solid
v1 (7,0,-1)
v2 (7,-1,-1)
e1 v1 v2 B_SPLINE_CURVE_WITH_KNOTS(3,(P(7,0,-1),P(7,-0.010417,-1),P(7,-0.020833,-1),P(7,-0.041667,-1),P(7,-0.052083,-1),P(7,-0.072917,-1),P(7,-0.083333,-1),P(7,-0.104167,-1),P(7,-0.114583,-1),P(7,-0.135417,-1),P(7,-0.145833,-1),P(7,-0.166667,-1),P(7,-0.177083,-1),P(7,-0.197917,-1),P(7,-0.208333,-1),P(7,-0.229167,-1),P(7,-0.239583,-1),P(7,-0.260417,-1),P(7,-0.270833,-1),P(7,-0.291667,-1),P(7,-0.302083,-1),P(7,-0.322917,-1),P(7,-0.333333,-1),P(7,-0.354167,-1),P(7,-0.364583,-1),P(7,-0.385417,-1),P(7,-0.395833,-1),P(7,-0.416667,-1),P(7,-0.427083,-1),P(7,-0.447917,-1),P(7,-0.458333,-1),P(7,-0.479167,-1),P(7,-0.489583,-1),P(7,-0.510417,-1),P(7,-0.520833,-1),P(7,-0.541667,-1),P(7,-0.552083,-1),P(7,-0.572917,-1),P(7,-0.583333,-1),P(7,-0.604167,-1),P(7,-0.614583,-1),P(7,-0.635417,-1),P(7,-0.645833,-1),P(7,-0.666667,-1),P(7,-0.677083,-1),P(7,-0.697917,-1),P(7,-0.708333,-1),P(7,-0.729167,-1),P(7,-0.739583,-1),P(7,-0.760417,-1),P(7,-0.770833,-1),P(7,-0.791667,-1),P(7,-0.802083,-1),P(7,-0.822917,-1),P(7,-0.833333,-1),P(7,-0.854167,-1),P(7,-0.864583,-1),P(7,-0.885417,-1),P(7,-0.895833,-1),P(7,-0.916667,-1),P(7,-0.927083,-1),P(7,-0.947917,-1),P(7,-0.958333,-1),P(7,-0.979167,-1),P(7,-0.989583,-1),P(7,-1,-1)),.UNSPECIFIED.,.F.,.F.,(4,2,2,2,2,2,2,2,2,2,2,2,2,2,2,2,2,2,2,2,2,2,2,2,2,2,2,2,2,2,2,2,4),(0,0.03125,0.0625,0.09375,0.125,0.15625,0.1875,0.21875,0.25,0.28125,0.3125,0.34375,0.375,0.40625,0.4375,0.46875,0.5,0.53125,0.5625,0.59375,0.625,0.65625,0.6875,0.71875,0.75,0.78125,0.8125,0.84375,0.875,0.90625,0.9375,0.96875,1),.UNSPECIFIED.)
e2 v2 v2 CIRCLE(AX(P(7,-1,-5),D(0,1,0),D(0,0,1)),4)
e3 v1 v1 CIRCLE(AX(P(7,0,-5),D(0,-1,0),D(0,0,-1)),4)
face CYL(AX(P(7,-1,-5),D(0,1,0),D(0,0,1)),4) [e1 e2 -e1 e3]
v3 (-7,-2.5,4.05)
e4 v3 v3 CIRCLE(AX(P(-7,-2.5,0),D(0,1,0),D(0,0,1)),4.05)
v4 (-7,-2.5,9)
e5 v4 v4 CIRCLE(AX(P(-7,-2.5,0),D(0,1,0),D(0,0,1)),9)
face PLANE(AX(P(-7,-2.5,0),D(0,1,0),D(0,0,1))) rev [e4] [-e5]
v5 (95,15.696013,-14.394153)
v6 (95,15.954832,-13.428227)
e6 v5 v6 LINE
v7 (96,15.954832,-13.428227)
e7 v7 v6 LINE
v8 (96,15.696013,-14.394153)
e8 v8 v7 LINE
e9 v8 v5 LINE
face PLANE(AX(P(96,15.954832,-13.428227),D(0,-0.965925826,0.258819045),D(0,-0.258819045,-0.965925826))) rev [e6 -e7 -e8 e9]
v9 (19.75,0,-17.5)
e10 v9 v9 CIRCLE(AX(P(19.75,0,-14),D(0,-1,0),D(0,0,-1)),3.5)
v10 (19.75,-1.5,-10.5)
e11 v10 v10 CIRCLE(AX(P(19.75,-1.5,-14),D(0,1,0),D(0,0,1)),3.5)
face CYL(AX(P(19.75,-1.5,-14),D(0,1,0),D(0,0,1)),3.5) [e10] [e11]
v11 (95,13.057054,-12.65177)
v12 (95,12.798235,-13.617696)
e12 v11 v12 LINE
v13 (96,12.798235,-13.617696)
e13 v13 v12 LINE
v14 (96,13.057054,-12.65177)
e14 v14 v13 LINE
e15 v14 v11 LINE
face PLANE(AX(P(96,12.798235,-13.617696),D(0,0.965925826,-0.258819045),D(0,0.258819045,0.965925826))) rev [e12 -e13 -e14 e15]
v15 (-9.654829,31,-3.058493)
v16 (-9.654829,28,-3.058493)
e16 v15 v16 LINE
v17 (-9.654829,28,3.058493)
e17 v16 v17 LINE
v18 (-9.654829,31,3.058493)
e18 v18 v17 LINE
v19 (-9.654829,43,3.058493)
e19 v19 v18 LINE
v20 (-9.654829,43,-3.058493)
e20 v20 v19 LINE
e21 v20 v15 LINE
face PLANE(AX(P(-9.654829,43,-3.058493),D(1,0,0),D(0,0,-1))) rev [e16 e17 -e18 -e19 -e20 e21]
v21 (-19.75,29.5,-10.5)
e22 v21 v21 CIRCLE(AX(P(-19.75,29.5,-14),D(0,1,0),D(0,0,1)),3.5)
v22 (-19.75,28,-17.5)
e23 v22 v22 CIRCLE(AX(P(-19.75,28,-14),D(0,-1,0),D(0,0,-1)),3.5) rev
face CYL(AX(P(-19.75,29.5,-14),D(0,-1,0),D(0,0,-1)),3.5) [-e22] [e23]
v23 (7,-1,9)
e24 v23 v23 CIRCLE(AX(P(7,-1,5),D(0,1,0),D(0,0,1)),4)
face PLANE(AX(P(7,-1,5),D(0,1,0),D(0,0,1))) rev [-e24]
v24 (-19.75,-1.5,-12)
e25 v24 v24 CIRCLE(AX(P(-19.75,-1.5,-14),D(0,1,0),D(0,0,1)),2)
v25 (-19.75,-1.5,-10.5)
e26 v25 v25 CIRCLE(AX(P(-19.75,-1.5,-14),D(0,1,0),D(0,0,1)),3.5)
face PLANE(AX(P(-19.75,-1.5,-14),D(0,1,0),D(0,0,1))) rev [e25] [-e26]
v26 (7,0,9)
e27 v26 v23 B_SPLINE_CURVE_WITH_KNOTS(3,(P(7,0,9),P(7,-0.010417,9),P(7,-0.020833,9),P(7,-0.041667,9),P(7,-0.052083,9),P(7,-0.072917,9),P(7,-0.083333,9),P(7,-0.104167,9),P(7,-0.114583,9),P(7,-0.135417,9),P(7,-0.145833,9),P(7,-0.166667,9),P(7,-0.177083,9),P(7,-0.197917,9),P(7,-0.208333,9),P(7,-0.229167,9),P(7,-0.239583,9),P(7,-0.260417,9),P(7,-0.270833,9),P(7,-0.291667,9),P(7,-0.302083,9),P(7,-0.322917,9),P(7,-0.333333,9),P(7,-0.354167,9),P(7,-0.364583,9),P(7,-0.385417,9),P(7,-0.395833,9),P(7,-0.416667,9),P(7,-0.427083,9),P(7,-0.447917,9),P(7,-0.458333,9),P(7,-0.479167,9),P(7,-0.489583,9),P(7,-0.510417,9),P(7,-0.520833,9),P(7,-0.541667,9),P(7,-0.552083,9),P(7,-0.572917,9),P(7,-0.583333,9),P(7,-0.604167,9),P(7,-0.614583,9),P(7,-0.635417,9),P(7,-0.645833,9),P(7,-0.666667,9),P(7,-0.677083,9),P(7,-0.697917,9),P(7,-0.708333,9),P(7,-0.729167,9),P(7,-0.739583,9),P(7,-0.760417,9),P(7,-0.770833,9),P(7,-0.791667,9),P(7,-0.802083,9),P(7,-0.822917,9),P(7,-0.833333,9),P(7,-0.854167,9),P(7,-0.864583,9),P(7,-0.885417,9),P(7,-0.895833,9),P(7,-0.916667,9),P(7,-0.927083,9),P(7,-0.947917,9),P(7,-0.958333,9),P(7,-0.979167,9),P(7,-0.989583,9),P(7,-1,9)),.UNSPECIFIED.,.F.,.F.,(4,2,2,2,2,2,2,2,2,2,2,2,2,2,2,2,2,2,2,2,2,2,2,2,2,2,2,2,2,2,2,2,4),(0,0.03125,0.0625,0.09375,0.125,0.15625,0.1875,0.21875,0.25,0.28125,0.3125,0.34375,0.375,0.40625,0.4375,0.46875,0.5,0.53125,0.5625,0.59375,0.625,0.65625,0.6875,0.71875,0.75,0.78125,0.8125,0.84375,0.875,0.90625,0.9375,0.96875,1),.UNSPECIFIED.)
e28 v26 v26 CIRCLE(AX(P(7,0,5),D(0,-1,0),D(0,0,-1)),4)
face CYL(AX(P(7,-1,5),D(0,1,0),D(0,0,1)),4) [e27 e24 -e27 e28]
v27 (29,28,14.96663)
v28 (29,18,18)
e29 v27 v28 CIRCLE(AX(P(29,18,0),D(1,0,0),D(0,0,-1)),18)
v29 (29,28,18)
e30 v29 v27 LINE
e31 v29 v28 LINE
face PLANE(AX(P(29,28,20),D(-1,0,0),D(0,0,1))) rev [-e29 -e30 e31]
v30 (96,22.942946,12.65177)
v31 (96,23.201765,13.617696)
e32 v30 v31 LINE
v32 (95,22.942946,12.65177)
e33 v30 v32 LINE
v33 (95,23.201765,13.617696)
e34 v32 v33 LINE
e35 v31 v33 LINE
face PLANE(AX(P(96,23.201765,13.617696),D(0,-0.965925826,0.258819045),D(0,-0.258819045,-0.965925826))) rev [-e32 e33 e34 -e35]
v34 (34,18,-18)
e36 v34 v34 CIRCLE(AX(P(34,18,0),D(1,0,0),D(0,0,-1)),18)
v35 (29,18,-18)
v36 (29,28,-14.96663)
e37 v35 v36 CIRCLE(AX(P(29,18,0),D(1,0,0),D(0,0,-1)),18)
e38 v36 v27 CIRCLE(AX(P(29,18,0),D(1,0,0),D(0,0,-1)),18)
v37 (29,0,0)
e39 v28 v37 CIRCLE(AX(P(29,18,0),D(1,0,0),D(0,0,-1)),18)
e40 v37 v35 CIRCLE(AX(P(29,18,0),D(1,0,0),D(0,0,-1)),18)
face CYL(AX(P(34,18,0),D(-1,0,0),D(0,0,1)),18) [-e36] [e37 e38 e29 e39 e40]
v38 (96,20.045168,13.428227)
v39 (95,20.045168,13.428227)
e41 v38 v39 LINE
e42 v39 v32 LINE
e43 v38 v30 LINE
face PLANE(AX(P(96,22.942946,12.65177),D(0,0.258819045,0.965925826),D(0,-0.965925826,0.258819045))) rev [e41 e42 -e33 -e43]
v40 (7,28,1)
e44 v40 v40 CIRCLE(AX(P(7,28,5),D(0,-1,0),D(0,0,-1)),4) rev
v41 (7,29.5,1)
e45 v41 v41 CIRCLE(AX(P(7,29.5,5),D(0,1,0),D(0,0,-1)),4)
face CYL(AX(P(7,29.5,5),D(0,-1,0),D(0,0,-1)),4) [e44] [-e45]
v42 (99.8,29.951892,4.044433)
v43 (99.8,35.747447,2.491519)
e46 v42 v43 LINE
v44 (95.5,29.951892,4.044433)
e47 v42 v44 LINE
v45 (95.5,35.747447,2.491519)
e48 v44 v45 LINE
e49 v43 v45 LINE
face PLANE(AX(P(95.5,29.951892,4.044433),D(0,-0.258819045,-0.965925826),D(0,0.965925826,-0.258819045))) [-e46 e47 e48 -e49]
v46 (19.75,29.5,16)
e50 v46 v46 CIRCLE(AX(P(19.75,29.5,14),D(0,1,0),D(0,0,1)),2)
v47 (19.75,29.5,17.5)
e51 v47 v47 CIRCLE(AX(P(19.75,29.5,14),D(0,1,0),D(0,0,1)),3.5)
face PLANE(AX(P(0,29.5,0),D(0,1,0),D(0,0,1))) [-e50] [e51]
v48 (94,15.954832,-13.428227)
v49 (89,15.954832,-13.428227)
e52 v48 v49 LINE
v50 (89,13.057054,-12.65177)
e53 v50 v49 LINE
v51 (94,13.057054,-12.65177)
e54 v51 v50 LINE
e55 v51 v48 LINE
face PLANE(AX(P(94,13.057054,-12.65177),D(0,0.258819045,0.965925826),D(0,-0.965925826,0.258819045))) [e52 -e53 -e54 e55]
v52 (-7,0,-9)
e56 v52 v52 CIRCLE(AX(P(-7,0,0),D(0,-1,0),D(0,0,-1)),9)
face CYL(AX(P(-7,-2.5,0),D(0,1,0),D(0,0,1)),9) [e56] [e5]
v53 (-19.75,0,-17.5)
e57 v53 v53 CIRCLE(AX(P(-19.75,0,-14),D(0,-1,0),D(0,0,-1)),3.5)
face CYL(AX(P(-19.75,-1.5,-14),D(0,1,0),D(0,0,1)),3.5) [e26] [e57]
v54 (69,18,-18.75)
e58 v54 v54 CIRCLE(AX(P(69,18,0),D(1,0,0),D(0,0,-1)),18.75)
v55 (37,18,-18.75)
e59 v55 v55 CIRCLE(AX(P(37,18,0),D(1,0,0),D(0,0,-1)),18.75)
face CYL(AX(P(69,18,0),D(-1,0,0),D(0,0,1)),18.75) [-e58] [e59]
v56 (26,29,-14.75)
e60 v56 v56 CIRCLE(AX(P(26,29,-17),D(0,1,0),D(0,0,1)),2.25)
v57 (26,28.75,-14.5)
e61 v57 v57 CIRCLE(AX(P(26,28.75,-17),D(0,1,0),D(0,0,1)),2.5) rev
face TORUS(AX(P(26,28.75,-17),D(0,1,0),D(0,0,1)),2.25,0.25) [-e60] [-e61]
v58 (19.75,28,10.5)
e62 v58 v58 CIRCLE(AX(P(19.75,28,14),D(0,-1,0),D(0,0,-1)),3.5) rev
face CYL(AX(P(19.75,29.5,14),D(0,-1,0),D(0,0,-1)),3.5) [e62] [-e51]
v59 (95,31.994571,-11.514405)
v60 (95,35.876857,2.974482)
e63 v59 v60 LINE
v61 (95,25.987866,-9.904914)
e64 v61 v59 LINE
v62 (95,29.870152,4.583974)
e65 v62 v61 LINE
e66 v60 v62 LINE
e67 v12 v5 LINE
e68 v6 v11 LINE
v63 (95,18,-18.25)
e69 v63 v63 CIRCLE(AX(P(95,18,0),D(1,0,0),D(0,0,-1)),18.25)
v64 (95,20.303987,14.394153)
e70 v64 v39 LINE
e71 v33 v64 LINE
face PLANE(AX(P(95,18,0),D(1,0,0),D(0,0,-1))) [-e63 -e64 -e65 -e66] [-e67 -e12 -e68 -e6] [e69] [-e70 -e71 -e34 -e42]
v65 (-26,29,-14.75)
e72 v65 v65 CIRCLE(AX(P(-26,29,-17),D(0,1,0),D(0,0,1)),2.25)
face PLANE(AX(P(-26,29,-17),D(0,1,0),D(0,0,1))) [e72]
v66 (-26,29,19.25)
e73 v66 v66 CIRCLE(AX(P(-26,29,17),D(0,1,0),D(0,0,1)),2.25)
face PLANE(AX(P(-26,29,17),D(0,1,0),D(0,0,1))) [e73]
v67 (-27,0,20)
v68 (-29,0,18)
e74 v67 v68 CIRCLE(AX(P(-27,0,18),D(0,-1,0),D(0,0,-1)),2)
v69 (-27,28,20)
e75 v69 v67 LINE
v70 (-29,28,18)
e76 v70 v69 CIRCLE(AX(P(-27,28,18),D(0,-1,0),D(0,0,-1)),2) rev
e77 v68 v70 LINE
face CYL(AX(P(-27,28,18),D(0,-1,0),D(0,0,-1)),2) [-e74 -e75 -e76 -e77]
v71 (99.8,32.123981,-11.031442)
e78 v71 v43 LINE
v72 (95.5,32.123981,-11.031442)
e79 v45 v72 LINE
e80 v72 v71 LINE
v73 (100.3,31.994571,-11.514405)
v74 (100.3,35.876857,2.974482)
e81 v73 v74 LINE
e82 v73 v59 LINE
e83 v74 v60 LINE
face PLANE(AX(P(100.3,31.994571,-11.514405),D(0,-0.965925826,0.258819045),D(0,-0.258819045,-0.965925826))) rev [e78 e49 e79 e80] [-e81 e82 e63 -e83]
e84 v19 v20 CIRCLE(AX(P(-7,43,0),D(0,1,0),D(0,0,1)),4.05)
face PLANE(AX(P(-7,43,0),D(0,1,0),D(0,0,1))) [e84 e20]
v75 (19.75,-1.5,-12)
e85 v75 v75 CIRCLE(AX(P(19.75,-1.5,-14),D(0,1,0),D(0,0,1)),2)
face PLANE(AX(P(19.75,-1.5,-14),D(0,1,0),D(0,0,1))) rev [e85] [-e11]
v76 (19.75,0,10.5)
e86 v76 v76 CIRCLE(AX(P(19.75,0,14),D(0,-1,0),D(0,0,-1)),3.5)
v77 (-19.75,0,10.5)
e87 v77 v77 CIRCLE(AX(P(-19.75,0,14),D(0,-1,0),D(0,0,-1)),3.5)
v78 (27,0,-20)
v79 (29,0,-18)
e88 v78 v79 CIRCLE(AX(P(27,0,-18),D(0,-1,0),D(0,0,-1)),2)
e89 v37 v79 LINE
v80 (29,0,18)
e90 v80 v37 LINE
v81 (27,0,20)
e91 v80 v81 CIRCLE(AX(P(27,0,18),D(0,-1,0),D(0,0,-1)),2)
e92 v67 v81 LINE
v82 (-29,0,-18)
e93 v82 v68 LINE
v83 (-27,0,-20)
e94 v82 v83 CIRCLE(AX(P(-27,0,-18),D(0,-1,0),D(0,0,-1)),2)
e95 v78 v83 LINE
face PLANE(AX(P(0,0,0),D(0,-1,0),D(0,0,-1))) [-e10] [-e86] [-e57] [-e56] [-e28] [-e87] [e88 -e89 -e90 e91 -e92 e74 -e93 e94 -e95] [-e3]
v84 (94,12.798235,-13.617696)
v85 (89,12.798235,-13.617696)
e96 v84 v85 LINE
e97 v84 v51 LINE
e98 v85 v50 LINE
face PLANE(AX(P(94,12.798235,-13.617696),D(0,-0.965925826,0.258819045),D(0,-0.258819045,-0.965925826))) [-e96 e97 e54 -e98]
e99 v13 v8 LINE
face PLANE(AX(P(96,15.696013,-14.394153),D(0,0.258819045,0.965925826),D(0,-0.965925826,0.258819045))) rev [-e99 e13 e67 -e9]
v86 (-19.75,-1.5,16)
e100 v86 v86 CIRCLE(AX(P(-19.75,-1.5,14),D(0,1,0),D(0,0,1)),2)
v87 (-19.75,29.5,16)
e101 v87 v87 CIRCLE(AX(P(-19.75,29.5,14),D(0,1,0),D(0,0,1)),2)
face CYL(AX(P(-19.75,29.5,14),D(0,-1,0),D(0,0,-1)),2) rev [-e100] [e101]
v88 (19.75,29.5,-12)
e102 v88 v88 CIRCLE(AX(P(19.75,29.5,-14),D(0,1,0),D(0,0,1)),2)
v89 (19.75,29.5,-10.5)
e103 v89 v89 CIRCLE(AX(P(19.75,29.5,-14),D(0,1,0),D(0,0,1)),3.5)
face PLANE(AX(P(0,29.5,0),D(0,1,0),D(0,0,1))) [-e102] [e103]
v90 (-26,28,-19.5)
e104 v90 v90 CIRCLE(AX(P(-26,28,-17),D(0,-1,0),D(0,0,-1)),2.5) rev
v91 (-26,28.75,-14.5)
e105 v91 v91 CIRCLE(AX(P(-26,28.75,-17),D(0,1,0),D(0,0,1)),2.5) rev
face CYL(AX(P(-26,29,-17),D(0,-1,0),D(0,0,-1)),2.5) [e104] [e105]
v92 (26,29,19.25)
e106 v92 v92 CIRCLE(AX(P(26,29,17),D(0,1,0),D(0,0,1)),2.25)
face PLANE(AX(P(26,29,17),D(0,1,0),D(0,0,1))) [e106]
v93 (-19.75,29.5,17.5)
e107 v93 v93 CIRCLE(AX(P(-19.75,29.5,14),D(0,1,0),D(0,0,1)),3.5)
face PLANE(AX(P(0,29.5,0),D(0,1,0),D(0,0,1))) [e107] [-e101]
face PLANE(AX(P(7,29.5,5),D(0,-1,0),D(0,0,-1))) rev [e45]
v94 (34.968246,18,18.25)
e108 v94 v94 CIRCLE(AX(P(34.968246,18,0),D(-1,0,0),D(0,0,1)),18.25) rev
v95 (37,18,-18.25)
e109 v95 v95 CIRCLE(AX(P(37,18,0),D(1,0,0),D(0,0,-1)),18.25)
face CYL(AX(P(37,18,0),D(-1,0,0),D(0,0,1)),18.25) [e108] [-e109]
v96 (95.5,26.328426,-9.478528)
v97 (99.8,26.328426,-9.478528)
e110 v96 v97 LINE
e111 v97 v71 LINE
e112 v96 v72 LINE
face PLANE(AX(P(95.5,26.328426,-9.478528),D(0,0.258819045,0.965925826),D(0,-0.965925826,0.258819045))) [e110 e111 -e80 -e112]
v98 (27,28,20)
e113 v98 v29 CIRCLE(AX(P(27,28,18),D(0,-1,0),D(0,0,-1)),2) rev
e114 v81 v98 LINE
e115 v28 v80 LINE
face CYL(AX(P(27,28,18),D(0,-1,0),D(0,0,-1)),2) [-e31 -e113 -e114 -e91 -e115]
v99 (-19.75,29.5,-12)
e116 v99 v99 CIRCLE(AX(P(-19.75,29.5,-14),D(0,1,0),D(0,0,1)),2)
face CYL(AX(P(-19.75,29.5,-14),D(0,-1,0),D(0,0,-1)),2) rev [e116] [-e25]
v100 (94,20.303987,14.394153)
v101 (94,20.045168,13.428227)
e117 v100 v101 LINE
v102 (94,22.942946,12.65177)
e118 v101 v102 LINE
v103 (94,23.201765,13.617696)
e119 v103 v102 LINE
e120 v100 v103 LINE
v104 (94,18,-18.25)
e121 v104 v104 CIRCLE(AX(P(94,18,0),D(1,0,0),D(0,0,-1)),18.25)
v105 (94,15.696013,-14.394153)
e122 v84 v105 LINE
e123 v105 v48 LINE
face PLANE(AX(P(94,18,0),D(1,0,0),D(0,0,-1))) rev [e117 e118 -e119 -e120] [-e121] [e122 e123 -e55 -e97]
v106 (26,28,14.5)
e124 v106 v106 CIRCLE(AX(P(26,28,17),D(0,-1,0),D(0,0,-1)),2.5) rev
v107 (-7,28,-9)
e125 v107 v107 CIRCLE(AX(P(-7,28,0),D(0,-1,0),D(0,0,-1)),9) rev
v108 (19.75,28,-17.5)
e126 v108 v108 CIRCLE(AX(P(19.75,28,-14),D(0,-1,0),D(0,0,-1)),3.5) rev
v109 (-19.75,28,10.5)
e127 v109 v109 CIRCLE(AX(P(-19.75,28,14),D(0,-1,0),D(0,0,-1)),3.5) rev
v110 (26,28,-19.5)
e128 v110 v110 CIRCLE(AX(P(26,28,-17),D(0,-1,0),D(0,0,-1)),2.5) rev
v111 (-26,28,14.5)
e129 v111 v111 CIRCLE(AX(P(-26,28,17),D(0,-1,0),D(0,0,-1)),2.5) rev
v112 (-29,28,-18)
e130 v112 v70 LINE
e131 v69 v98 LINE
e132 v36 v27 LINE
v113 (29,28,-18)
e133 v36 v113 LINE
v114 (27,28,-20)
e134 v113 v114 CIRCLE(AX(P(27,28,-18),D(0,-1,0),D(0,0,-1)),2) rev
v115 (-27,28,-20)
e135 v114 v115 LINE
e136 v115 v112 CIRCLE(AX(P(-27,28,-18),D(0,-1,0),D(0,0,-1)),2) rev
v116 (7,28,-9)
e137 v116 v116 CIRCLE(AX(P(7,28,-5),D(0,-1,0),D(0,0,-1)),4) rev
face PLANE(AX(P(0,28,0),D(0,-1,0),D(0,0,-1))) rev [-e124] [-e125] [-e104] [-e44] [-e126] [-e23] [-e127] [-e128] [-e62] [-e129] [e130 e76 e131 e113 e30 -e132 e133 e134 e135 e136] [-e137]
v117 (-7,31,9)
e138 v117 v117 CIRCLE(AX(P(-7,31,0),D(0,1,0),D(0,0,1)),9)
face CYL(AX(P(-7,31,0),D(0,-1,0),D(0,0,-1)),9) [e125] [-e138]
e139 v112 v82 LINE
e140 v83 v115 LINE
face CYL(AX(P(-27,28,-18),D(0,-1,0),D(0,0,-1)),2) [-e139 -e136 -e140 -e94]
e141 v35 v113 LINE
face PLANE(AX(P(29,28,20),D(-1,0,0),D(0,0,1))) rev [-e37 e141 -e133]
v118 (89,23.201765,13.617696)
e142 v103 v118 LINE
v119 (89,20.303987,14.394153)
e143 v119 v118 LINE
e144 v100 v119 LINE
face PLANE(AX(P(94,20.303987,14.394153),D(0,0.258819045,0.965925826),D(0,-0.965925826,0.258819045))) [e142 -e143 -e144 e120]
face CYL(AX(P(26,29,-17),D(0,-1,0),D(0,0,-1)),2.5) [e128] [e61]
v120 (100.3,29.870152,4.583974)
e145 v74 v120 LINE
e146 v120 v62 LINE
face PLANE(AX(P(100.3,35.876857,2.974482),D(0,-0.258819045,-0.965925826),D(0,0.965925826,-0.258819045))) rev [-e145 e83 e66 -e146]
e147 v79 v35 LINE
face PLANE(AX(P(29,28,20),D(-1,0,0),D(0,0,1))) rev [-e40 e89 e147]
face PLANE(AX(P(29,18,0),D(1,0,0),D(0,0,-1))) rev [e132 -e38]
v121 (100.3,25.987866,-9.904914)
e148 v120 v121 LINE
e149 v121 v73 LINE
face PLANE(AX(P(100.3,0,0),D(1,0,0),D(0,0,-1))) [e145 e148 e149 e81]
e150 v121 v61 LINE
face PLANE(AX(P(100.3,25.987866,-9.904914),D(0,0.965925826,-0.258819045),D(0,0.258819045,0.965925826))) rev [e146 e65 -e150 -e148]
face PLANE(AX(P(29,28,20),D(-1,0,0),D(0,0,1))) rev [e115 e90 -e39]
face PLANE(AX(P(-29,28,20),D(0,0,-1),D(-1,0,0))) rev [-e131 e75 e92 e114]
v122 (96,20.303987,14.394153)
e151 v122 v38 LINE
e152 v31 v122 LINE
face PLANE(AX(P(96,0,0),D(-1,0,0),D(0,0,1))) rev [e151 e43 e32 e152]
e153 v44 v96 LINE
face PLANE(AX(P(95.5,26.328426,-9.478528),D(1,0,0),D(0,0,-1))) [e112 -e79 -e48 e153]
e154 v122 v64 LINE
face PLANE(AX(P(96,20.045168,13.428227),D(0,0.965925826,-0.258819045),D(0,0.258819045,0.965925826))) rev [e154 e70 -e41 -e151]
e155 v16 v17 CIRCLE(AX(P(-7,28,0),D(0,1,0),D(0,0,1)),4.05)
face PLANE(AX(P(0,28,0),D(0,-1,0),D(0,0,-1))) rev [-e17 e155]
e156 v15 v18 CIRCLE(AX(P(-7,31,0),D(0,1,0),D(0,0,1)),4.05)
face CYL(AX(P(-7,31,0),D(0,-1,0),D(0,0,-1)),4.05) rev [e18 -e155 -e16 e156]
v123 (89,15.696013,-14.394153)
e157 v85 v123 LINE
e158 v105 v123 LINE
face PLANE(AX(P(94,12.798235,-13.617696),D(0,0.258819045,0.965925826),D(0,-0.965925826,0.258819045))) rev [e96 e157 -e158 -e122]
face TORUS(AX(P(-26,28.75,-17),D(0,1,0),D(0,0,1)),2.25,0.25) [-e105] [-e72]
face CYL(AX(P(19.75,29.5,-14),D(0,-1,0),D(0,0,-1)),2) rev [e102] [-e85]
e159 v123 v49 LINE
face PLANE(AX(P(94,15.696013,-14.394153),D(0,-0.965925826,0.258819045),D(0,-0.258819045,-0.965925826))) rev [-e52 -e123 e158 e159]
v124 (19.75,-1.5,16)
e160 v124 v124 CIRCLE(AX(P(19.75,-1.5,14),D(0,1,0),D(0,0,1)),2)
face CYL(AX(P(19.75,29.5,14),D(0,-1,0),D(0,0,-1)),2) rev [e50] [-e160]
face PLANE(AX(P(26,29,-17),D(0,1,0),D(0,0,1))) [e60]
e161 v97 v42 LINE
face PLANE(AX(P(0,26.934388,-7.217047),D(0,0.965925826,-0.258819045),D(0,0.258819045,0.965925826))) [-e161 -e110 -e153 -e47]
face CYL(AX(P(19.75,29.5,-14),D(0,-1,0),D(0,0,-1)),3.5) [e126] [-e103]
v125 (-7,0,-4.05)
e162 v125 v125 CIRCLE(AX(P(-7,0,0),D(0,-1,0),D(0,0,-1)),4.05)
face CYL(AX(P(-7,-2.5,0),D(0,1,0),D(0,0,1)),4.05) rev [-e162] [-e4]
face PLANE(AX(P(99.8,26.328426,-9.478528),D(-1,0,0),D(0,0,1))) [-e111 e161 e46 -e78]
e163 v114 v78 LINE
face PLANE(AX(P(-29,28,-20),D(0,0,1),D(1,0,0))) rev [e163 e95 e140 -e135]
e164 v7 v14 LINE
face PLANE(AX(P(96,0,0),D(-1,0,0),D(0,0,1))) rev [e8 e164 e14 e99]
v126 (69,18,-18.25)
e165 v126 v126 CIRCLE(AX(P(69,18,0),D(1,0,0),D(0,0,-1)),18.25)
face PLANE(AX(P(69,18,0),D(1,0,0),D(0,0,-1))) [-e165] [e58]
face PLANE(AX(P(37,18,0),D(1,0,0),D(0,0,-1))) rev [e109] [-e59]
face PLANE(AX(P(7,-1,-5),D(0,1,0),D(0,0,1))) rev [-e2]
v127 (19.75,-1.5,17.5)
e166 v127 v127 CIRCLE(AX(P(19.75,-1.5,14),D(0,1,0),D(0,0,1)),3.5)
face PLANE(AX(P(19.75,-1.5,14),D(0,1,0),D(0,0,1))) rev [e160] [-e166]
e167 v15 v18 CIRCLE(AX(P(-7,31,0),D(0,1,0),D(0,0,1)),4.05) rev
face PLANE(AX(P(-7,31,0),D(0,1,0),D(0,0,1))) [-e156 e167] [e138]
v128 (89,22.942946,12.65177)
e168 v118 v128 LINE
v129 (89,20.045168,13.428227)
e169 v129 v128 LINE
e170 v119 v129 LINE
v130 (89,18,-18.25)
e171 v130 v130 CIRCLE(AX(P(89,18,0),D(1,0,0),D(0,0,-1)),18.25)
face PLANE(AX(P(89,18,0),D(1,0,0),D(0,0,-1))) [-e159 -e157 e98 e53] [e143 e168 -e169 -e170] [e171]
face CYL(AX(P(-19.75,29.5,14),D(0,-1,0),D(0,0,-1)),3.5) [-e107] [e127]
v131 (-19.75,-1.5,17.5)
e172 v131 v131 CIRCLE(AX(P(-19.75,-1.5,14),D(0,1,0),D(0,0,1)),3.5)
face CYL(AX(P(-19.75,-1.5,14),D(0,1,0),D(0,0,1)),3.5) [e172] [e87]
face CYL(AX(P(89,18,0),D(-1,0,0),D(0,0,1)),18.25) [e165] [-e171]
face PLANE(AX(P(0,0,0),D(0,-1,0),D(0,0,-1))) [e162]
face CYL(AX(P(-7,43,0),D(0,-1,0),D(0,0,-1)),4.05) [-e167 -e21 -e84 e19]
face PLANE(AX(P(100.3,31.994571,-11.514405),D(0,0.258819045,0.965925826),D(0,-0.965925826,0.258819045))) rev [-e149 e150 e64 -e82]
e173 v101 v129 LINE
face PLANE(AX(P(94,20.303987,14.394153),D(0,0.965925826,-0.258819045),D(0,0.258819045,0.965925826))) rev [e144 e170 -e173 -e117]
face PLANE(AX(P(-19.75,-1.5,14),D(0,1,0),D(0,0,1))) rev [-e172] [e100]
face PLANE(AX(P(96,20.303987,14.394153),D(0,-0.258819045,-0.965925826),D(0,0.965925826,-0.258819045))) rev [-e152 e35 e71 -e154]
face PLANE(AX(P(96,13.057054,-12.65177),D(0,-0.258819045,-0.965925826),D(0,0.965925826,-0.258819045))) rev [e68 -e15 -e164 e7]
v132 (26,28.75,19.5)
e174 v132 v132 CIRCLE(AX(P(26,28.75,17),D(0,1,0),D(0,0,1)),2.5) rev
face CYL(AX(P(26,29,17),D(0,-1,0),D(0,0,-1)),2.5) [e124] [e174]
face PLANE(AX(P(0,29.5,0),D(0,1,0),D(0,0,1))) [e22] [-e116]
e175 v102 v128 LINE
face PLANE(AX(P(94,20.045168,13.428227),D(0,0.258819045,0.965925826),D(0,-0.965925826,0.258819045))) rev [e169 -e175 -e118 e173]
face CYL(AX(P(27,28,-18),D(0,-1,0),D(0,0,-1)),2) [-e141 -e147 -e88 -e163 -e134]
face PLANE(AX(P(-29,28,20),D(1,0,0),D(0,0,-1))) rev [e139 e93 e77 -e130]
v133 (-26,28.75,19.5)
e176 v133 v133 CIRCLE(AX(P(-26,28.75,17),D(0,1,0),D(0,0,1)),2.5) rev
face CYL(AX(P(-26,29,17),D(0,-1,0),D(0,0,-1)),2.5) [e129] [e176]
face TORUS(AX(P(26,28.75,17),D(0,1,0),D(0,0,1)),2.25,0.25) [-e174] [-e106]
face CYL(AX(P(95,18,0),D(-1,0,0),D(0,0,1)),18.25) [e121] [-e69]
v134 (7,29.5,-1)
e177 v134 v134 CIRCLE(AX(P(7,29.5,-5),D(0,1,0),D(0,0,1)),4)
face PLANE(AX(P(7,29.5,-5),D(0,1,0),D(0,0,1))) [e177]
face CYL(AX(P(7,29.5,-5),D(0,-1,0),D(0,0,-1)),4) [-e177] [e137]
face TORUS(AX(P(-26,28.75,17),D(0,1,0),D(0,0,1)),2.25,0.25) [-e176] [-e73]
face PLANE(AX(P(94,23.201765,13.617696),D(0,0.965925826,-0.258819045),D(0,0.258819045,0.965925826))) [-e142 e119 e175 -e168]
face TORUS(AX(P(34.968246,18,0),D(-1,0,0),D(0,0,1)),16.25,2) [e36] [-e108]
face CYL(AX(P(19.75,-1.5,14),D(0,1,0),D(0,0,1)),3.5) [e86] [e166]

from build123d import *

# Parameters (mm, degrees)
CROQUIS1_W               = 58
CROQUIS1_H               = 40
SALIENTE_EXTRUIR1_DEPTH  = 28
CROQUIS2_R               = 2.5
SALIENTE_EXTRUIR2_DEPTH  = 1
SALIENTE_EXTRUIR3_DEPTH  = 1.5
CROQUIS4_R               = 9
CROQUIS4_R_2             = 4.05
SALIENTE_EXTRUIR4_DEPTH  = 3
CROQUIS5_R               = 4
SALIENTE_EXTRUIR5_DEPTH  = 1.5
REDONDEO1_R              = 0.25
REDONDEO2_R              = 0.1
REDONDEO3_R              = 2
SALIENTE_EXTRUIR6_START  = -31
CROQUIS7_R               = 3.5
CROQUIS7_R_2             = 2
SALIENTE_EXTRUIR6_DEPTH  = 31
SALIENTE_EXTRUIR7_START  = -33.5
CROQUIS8_R               = 9
CROQUIS8_R_2             = 4.05
SALIENTE_EXTRUIR7_DEPTH  = 33.5
SALIENTE_EXTRUIR8_START  = -30.5
CROQUIS9_R               = 4
SALIENTE_EXTRUIR8_DEPTH  = 30.5
CORTAR_EXTRUIR1_START    = -30.5
CROQUIS10_R              = 2
CORTAR_EXTRUIR1_DEPTH    = 30.5
SALIENTE_EXTRUIR9_DEPTH  = 15
CROQUIS12_R              = 18
SALIENTE_EXTRUIR10_DEPTH = 5
CROQUIS13_R              = 18.25
SALIENTE_EXTRUIR11_DEPTH = 3
REDONDEO4_R              = 2
CROQUIS14_R              = 18.75
SALIENTE_EXTRUIR12_DEPTH = 32
CROQUIS15_R              = 18.25
SALIENTE_EXTRUIR13_DEPTH = 20
SALIENTE_EXTRUIR14_DEPTH = 5
CROQUIS18_R              = 18.25
SALIENTE_EXTRUIR15_DEPTH = 1
SALIENTE_EXTRUIR16_DEPTH = 1
SALIENTE_EXTRUIR17_DEPTH = 5.3
CROQUIS21_W              = 4.3
CROQUIS21_H              = 14
CORTAR_EXTRUIR2_DEPTH    = 6


with BuildPart() as part:
    # Croquis1 → Saliente-Extruir1 (new body)
    with BuildSketch(Plane(origin=(0, 0, 0), x_dir=(1, 0, 0), z_dir=(0, 1, 0))):
        Rectangle(CROQUIS1_W, CROQUIS1_H)
    extrude(amount=SALIENTE_EXTRUIR1_DEPTH)

    # Croquis2 → Saliente-Extruir2 (add)
    with BuildSketch(Plane(origin=(0, 28, 0), x_dir=(1, 0, 0), z_dir=(0, 1, 0))):
        with Locations(Location((-26, 17, 0), (0, 0, 90))):
            Circle(CROQUIS2_R)
        with Locations(Location((26, 17, 0), (0, 0, 90))):
            Circle(CROQUIS2_R)
        with Locations(Location((26, -17, 0), (0, 0, 90))):
            Circle(CROQUIS2_R)
        with Locations(Location((-26, -17, 0), (0, 0, 90))):
            Circle(CROQUIS2_R)
    extrude(amount=SALIENTE_EXTRUIR2_DEPTH)

    # Croquis3 → Saliente-Extruir3 (add)
    with BuildSketch(Plane(origin=(0, 28, 0), x_dir=(1, 0, 0), z_dir=(0, 1, 0))):
        with BuildLine():
            ThreePointArc((-16.25, 14), (-22.224873734, 16.474873734), (-19.75, 10.5))
            Line((-19.75, 10.5), (-19.75, 12))
            ThreePointArc((-19.75, 12), (-21.164213562, 15.414213562), (-17.75, 14))
            Line((-17.75, 14), (-16.25, 14))
        make_face()
        with BuildLine():
            Line((-19.75, 12), (-19.75, 10.5))
            ThreePointArc((-19.75, 10.5), (-17.275126266, 11.525126266), (-16.25, 14))
            Line((-16.25, 14), (-17.75, 14))
            ThreePointArc((-17.75, 14), (-18.335786438, 12.585786438), (-19.75, 12))
        make_face()
        with BuildLine():
            ThreePointArc((-19.75, -12), (-18.335786438, -12.585786438), (-17.75, -14))
            Line((-17.75, -14), (-16.25, -14))
            ThreePointArc((-16.25, -14), (-17.275126266, -11.525126266), (-19.75, -10.5))
            Line((-19.75, -10.5), (-19.75, -12))
        make_face()
        with BuildLine():
            Line((-16.25, -14), (-17.75, -14))
            ThreePointArc((-17.75, -14), (-21.164213562, -15.414213562), (-19.75, -12))
            Line((-19.75, -12), (-19.75, -10.5))
            ThreePointArc((-19.75, -10.5), (-22.224873734, -16.474873734), (-16.25, -14))
        make_face()
        with BuildLine():
            ThreePointArc((19.75, -10.5), (17.275126266, -11.525126266), (16.25, -14))
            Line((16.25, -14), (17.75, -14))
            ThreePointArc((17.75, -14), (18.335786438, -12.585786438), (19.75, -12))
            Line((19.75, -12), (19.75, -10.5))
        make_face()
        with BuildLine():
            Line((17.75, -14), (16.25, -14))
            ThreePointArc((16.25, -14), (19.75, -17.5), (23.25, -14))
            ThreePointArc((23.25, -14), (22.224873734, -11.525126266), (19.75, -10.5))
            Line((19.75, -10.5), (19.75, -12))
            ThreePointArc((19.75, -12), (21.164213562, -12.585786438), (21.75, -14))
            ThreePointArc((21.75, -14), (19.75, -16), (17.75, -14))
        make_face()
        with BuildLine():
            ThreePointArc((16.25, 14), (17.275126266, 11.525126266), (19.75, 10.5))
            Line((19.75, 10.5), (19.75, 12))
            ThreePointArc((19.75, 12), (18.335786438, 12.585786438), (17.75, 14))
            Line((17.75, 14), (16.25, 14))
        make_face()
        with BuildLine():
            Line((19.75, 12), (19.75, 10.5))
            ThreePointArc((19.75, 10.5), (22.224873734, 11.525126266), (23.25, 14))
            ThreePointArc((23.25, 14), (19.75, 17.5), (16.25, 14))
            Line((16.25, 14), (17.75, 14))
            ThreePointArc((17.75, 14), (19.75, 16), (21.75, 14))
            ThreePointArc((21.75, 14), (21.164213562, 12.585786438), (19.75, 12))
        make_face()
    extrude(amount=SALIENTE_EXTRUIR3_DEPTH)

    # Croquis4 → Saliente-Extruir4 (add)
    with BuildSketch(Plane(origin=(0, 28, 0), x_dir=(1, 0, 0), z_dir=(0, 1, 0))):
        with Locations(Location((-7, 0, 0), (0, 0, 90))):
            Circle(CROQUIS4_R)
        with Locations(Location((-7, 0, 0), (0, 0, 270))):
            Circle(CROQUIS4_R_2, mode=Mode.SUBTRACT)
    extrude(amount=SALIENTE_EXTRUIR4_DEPTH)

    # Croquis5 → Saliente-Extruir5 (add)
    with BuildSketch(Plane(origin=(0, 28, 0), x_dir=(1, 0, 0), z_dir=(0, 1, 0))):
        with Locations(Location((7, 5, 0), (0, 0, 90))):
            Circle(CROQUIS5_R)
        with Locations(Location((7, -5, 0), (0, 0, 90))):
            Circle(CROQUIS5_R)
    extrude(amount=SALIENTE_EXTRUIR5_DEPTH)

    # Redondeo1
    redondeo1_edges = [part.edges().sort_by_distance(p)[0] for p in [
        (-26, 29, -14.5),
        (26, 29, -14.5),
        (26, 29, 19.5),
        (-26, 29, 19.5),
    ]]
    fillet(redondeo1_edges, radius=REDONDEO1_R)

    # Redondeo2
    redondeo2_edges = [part.edges().sort_by_distance(p)[0] for p in [
        (-19.75, 29.5, -17.5),
        (-23.25, 29.5, 14),
        (16.25, 29.5, 14),
        (23.25, 29.5, -14),
    ]]
    fillet(redondeo2_edges, radius=REDONDEO2_R)

    # Redondeo3
    redondeo3_edges = [part.edges().sort_by_distance(p)[0] for p in [
        (29, 14, 20),
        (-29, 14, 20),
        (-29, 14, -20),
        (29, 14, -20),
    ]]
    fillet(redondeo3_edges, radius=REDONDEO3_R)

    # Croquis7 → Saliente-Extruir6 (add)
    # profile 1 of 4: a face of its own
    with BuildSketch(Plane(origin=(0, 29.5, 0), x_dir=(1, 0, 0), z_dir=(0, 1, 0)).offset(SALIENTE_EXTRUIR6_START)):
        with Locations(Location((-19.75, 14, 0), (0, 0, 90))):
            Circle(CROQUIS7_R)
        with Locations(Location((-19.75, 14, 0), (0, 0, 270))):
            Circle(CROQUIS7_R_2, mode=Mode.SUBTRACT)
    # profile 2 of 4: a face of its own
    with BuildSketch(Plane(origin=(0, 29.5, 0), x_dir=(1, 0, 0), z_dir=(0, 1, 0)).offset(SALIENTE_EXTRUIR6_START)):
        with Locations(Location((-19.75, -14, 0), (0, 0, 90))):
            Circle(CROQUIS7_R)
        with Locations(Location((-19.75, -14, 0), (0, 0, 270))):
            Circle(CROQUIS7_R_2, mode=Mode.SUBTRACT)
    # profile 3 of 4: a face of its own
    with BuildSketch(Plane(origin=(0, 29.5, 0), x_dir=(1, 0, 0), z_dir=(0, 1, 0)).offset(SALIENTE_EXTRUIR6_START)):
        with Locations(Location((19.75, -14, 0), (0, 0, 90))):
            Circle(CROQUIS7_R)
        with Locations(Location((19.75, -14, 0), (0, 0, 270))):
            Circle(CROQUIS7_R_2, mode=Mode.SUBTRACT)
    # profile 4 of 4: a face of its own
    with BuildSketch(Plane(origin=(0, 29.5, 0), x_dir=(1, 0, 0), z_dir=(0, 1, 0)).offset(SALIENTE_EXTRUIR6_START)):
        with Locations(Location((19.75, 14, 0), (0, 0, 90))):
            Circle(CROQUIS7_R)
        with Locations(Location((19.75, 14, 0), (0, 0, 270))):
            Circle(CROQUIS7_R_2, mode=Mode.SUBTRACT)
    extrude(amount=SALIENTE_EXTRUIR6_DEPTH)

    # Croquis8 → Saliente-Extruir7 (add)
    with BuildSketch(Plane(origin=(0, 31, 0), x_dir=(1, 0, 0), z_dir=(0, 1, 0)).offset(SALIENTE_EXTRUIR7_START)):
        with Locations(Location((-7, 0, 0), (0, 0, 90))):
            Circle(CROQUIS8_R)
        with Locations(Location((-7, 0, 0), (0, 0, 270))):
            Circle(CROQUIS8_R_2, mode=Mode.SUBTRACT)
    extrude(amount=SALIENTE_EXTRUIR7_DEPTH)

    # Croquis9 → Saliente-Extruir8 (add)
    with BuildSketch(Plane(origin=(0, 29.5, 0), x_dir=(1, 0, 0), z_dir=(0, 1, 0)).offset(SALIENTE_EXTRUIR8_START)):
        with Locations(Location((7, 5, 0), (0, 0, 90))):
            Circle(CROQUIS9_R)
        with Locations(Location((7, -5, 0), (0, 0, 90))):
            Circle(CROQUIS9_R)
    extrude(amount=SALIENTE_EXTRUIR8_DEPTH)

    # Croquis10 → Cortar-Extruir1 (cut)
    with BuildSketch(Plane(origin=(0, 28, 0), x_dir=(1, 0, 0), z_dir=(0, 1, 0)).offset(CORTAR_EXTRUIR1_START)):
        with Locations(Location((-19.75, 14, 0), (0, 0, 270))):
            Circle(CROQUIS10_R)
        with Locations(Location((-19.75, -14, 0), (0, 0, 270))):
            Circle(CROQUIS10_R)
        with Locations(Location((19.75, -14, 0), (0, 0, 270))):
            Circle(CROQUIS10_R)
        with Locations(Location((19.75, 14, 0), (0, 0, 270))):
            Circle(CROQUIS10_R)
    extrude(amount=CORTAR_EXTRUIR1_DEPTH, mode=Mode.SUBTRACT)

    # Croquis11 → Saliente-Extruir9 (add)
    with BuildSketch(Plane(origin=(0, 28, 0), x_dir=(1, 0, 0), z_dir=(0, 1, 0))):
        with BuildLine():
            Line((-9.654829482, 3.058493162), (-9.654829482, -3.058493162))
            ThreePointArc((-9.654829482, -3.058493162), (-2.95, 0), (-9.654829482, 3.058493162))
        make_face()
    extrude(amount=SALIENTE_EXTRUIR9_DEPTH)

    # Croquis12 → Saliente-Extruir10 (add)
    with BuildSketch(Plane(origin=(29, 0, 0), x_dir=(0, 0, -1), z_dir=(1, 0, 0))):
        with Locations((0, 18)):
            Circle(CROQUIS12_R)
    extrude(amount=SALIENTE_EXTRUIR10_DEPTH)

    # Croquis13 → Saliente-Extruir11 (add)
    with BuildSketch(Plane(origin=(34, 0, 0), x_dir=(0, 0, -1), z_dir=(1, 0, 0))):
        with Locations((0, 18)):
            Circle(CROQUIS13_R)
    extrude(amount=SALIENTE_EXTRUIR11_DEPTH)

    # Redondeo4
    # the kernel refuses this fillet: 2 mm, written as the material it takes off along each edge
    with BuildSketch(Plane(origin=(34, 18, 0), x_dir=(0, 0, -1), z_dir=(0, -1, 0))) as redondeo4_piece_1:
        with BuildLine():
            CenterArc((16.25, 0.968245837), REDONDEO4_R, 331.044975628, 28.955024372)
            Line((18, 0), (18.035, -0.019364917))
            ThreePointArc((18.035, -0.019364917), (18.125, -0.04), (18.25, -0.04))
            Line((18.25, -0.04), (18.29, 0))
            Line((18.29, 0), (18.29, 0.968245837))
            Line((18.29, 0.968245837), (18.25, 0.968245837))
        make_face()
    revolve(axis=Axis((34, 18, 0), (1, 0, 0)), mode=Mode.SUBTRACT)

    # Croquis14 → Saliente-Extruir12 (add)
    with BuildSketch(Plane(origin=(37, 0, 0), x_dir=(0, 0, -1), z_dir=(1, 0, 0))):
        with Locations((0, 18)):
            Circle(CROQUIS14_R)
    extrude(amount=SALIENTE_EXTRUIR12_DEPTH)

    # Croquis15 → Saliente-Extruir13 (add)
    with BuildSketch(Plane(origin=(69, 0, 0), x_dir=(0, 0, -1), z_dir=(1, 0, 0))):
        with Locations(Location((0, 18, 0), (0, 0, 180))):
            Circle(CROQUIS15_R)
    extrude(amount=SALIENTE_EXTRUIR13_DEPTH)

    # Croquis16 → Saliente-Extruir14 (add)
    with BuildSketch(Plane(origin=(89, 0, 0), x_dir=(0, 0, -1), z_dir=(1, 0, 0))):
        Polygon((-14.394153049, 20.303987415), (-13.428227223, 20.045168369), (-12.651770087, 22.942945848), (-13.617695914, 23.201764893), align=None)
        Polygon((12.651770087, 13.057054152), (13.428227223, 15.954831631), (14.394153049, 15.696012585), (13.617695914, 12.798235107), align=None)
    extrude(amount=SALIENTE_EXTRUIR14_DEPTH)

    # Croquis18 → Saliente-Extruir15 (add)
    with BuildSketch(Plane(origin=(94, 0, 0), x_dir=(0, 0, -1), z_dir=(1, 0, 0))):
        with Locations(Location((0, 18, 0), (0, 0, 180))):
            Circle(CROQUIS18_R)
    extrude(amount=SALIENTE_EXTRUIR15_DEPTH)

    # Croquis19 → Saliente-Extruir16 (add)
    with BuildSketch(Plane(origin=(95, 0, 0), x_dir=(0, 0, -1), z_dir=(1, 0, 0))):
        Polygon((-14.394153049, 20.303987415), (-13.617695914, 23.201764893), (-12.651770087, 22.942945848), (-13.428227223, 20.045168369), align=None)
        Polygon((13.428227223, 15.954831631), (14.394153049, 15.696012585), (13.617695914, 12.798235107), (12.651770087, 13.057054152), align=None)
    extrude(amount=SALIENTE_EXTRUIR16_DEPTH)

    # Croquis20 → Saliente-Extruir17 (add)
    with BuildSketch(Plane(origin=(95, 0, 0), x_dir=(0, 0, -1), z_dir=(1, 0, 0))):
        Polygon((11.51440537, 31.99457107), (9.904913688, 25.98786634), (-4.583973706, 29.870152016), (-2.974482025, 35.876856747), align=None)
    extrude(amount=SALIENTE_EXTRUIR17_DEPTH)

    # Croquis21 → Cortar-Extruir2 (cut)
    with BuildSketch(Plane(origin=(0, 32.729942543, -8.769961673), x_dir=(1, 0, 0), z_dir=(0, -0.9659258262890691, 0.25881904510251813))):
        with Locations((97.65, 4.658742812)):
            Rectangle(CROQUIS21_W, CROQUIS21_H)
    extrude(amount=CORTAR_EXTRUIR2_DEPTH, mode=Mode.SUBTRACT)


solid = part.part
